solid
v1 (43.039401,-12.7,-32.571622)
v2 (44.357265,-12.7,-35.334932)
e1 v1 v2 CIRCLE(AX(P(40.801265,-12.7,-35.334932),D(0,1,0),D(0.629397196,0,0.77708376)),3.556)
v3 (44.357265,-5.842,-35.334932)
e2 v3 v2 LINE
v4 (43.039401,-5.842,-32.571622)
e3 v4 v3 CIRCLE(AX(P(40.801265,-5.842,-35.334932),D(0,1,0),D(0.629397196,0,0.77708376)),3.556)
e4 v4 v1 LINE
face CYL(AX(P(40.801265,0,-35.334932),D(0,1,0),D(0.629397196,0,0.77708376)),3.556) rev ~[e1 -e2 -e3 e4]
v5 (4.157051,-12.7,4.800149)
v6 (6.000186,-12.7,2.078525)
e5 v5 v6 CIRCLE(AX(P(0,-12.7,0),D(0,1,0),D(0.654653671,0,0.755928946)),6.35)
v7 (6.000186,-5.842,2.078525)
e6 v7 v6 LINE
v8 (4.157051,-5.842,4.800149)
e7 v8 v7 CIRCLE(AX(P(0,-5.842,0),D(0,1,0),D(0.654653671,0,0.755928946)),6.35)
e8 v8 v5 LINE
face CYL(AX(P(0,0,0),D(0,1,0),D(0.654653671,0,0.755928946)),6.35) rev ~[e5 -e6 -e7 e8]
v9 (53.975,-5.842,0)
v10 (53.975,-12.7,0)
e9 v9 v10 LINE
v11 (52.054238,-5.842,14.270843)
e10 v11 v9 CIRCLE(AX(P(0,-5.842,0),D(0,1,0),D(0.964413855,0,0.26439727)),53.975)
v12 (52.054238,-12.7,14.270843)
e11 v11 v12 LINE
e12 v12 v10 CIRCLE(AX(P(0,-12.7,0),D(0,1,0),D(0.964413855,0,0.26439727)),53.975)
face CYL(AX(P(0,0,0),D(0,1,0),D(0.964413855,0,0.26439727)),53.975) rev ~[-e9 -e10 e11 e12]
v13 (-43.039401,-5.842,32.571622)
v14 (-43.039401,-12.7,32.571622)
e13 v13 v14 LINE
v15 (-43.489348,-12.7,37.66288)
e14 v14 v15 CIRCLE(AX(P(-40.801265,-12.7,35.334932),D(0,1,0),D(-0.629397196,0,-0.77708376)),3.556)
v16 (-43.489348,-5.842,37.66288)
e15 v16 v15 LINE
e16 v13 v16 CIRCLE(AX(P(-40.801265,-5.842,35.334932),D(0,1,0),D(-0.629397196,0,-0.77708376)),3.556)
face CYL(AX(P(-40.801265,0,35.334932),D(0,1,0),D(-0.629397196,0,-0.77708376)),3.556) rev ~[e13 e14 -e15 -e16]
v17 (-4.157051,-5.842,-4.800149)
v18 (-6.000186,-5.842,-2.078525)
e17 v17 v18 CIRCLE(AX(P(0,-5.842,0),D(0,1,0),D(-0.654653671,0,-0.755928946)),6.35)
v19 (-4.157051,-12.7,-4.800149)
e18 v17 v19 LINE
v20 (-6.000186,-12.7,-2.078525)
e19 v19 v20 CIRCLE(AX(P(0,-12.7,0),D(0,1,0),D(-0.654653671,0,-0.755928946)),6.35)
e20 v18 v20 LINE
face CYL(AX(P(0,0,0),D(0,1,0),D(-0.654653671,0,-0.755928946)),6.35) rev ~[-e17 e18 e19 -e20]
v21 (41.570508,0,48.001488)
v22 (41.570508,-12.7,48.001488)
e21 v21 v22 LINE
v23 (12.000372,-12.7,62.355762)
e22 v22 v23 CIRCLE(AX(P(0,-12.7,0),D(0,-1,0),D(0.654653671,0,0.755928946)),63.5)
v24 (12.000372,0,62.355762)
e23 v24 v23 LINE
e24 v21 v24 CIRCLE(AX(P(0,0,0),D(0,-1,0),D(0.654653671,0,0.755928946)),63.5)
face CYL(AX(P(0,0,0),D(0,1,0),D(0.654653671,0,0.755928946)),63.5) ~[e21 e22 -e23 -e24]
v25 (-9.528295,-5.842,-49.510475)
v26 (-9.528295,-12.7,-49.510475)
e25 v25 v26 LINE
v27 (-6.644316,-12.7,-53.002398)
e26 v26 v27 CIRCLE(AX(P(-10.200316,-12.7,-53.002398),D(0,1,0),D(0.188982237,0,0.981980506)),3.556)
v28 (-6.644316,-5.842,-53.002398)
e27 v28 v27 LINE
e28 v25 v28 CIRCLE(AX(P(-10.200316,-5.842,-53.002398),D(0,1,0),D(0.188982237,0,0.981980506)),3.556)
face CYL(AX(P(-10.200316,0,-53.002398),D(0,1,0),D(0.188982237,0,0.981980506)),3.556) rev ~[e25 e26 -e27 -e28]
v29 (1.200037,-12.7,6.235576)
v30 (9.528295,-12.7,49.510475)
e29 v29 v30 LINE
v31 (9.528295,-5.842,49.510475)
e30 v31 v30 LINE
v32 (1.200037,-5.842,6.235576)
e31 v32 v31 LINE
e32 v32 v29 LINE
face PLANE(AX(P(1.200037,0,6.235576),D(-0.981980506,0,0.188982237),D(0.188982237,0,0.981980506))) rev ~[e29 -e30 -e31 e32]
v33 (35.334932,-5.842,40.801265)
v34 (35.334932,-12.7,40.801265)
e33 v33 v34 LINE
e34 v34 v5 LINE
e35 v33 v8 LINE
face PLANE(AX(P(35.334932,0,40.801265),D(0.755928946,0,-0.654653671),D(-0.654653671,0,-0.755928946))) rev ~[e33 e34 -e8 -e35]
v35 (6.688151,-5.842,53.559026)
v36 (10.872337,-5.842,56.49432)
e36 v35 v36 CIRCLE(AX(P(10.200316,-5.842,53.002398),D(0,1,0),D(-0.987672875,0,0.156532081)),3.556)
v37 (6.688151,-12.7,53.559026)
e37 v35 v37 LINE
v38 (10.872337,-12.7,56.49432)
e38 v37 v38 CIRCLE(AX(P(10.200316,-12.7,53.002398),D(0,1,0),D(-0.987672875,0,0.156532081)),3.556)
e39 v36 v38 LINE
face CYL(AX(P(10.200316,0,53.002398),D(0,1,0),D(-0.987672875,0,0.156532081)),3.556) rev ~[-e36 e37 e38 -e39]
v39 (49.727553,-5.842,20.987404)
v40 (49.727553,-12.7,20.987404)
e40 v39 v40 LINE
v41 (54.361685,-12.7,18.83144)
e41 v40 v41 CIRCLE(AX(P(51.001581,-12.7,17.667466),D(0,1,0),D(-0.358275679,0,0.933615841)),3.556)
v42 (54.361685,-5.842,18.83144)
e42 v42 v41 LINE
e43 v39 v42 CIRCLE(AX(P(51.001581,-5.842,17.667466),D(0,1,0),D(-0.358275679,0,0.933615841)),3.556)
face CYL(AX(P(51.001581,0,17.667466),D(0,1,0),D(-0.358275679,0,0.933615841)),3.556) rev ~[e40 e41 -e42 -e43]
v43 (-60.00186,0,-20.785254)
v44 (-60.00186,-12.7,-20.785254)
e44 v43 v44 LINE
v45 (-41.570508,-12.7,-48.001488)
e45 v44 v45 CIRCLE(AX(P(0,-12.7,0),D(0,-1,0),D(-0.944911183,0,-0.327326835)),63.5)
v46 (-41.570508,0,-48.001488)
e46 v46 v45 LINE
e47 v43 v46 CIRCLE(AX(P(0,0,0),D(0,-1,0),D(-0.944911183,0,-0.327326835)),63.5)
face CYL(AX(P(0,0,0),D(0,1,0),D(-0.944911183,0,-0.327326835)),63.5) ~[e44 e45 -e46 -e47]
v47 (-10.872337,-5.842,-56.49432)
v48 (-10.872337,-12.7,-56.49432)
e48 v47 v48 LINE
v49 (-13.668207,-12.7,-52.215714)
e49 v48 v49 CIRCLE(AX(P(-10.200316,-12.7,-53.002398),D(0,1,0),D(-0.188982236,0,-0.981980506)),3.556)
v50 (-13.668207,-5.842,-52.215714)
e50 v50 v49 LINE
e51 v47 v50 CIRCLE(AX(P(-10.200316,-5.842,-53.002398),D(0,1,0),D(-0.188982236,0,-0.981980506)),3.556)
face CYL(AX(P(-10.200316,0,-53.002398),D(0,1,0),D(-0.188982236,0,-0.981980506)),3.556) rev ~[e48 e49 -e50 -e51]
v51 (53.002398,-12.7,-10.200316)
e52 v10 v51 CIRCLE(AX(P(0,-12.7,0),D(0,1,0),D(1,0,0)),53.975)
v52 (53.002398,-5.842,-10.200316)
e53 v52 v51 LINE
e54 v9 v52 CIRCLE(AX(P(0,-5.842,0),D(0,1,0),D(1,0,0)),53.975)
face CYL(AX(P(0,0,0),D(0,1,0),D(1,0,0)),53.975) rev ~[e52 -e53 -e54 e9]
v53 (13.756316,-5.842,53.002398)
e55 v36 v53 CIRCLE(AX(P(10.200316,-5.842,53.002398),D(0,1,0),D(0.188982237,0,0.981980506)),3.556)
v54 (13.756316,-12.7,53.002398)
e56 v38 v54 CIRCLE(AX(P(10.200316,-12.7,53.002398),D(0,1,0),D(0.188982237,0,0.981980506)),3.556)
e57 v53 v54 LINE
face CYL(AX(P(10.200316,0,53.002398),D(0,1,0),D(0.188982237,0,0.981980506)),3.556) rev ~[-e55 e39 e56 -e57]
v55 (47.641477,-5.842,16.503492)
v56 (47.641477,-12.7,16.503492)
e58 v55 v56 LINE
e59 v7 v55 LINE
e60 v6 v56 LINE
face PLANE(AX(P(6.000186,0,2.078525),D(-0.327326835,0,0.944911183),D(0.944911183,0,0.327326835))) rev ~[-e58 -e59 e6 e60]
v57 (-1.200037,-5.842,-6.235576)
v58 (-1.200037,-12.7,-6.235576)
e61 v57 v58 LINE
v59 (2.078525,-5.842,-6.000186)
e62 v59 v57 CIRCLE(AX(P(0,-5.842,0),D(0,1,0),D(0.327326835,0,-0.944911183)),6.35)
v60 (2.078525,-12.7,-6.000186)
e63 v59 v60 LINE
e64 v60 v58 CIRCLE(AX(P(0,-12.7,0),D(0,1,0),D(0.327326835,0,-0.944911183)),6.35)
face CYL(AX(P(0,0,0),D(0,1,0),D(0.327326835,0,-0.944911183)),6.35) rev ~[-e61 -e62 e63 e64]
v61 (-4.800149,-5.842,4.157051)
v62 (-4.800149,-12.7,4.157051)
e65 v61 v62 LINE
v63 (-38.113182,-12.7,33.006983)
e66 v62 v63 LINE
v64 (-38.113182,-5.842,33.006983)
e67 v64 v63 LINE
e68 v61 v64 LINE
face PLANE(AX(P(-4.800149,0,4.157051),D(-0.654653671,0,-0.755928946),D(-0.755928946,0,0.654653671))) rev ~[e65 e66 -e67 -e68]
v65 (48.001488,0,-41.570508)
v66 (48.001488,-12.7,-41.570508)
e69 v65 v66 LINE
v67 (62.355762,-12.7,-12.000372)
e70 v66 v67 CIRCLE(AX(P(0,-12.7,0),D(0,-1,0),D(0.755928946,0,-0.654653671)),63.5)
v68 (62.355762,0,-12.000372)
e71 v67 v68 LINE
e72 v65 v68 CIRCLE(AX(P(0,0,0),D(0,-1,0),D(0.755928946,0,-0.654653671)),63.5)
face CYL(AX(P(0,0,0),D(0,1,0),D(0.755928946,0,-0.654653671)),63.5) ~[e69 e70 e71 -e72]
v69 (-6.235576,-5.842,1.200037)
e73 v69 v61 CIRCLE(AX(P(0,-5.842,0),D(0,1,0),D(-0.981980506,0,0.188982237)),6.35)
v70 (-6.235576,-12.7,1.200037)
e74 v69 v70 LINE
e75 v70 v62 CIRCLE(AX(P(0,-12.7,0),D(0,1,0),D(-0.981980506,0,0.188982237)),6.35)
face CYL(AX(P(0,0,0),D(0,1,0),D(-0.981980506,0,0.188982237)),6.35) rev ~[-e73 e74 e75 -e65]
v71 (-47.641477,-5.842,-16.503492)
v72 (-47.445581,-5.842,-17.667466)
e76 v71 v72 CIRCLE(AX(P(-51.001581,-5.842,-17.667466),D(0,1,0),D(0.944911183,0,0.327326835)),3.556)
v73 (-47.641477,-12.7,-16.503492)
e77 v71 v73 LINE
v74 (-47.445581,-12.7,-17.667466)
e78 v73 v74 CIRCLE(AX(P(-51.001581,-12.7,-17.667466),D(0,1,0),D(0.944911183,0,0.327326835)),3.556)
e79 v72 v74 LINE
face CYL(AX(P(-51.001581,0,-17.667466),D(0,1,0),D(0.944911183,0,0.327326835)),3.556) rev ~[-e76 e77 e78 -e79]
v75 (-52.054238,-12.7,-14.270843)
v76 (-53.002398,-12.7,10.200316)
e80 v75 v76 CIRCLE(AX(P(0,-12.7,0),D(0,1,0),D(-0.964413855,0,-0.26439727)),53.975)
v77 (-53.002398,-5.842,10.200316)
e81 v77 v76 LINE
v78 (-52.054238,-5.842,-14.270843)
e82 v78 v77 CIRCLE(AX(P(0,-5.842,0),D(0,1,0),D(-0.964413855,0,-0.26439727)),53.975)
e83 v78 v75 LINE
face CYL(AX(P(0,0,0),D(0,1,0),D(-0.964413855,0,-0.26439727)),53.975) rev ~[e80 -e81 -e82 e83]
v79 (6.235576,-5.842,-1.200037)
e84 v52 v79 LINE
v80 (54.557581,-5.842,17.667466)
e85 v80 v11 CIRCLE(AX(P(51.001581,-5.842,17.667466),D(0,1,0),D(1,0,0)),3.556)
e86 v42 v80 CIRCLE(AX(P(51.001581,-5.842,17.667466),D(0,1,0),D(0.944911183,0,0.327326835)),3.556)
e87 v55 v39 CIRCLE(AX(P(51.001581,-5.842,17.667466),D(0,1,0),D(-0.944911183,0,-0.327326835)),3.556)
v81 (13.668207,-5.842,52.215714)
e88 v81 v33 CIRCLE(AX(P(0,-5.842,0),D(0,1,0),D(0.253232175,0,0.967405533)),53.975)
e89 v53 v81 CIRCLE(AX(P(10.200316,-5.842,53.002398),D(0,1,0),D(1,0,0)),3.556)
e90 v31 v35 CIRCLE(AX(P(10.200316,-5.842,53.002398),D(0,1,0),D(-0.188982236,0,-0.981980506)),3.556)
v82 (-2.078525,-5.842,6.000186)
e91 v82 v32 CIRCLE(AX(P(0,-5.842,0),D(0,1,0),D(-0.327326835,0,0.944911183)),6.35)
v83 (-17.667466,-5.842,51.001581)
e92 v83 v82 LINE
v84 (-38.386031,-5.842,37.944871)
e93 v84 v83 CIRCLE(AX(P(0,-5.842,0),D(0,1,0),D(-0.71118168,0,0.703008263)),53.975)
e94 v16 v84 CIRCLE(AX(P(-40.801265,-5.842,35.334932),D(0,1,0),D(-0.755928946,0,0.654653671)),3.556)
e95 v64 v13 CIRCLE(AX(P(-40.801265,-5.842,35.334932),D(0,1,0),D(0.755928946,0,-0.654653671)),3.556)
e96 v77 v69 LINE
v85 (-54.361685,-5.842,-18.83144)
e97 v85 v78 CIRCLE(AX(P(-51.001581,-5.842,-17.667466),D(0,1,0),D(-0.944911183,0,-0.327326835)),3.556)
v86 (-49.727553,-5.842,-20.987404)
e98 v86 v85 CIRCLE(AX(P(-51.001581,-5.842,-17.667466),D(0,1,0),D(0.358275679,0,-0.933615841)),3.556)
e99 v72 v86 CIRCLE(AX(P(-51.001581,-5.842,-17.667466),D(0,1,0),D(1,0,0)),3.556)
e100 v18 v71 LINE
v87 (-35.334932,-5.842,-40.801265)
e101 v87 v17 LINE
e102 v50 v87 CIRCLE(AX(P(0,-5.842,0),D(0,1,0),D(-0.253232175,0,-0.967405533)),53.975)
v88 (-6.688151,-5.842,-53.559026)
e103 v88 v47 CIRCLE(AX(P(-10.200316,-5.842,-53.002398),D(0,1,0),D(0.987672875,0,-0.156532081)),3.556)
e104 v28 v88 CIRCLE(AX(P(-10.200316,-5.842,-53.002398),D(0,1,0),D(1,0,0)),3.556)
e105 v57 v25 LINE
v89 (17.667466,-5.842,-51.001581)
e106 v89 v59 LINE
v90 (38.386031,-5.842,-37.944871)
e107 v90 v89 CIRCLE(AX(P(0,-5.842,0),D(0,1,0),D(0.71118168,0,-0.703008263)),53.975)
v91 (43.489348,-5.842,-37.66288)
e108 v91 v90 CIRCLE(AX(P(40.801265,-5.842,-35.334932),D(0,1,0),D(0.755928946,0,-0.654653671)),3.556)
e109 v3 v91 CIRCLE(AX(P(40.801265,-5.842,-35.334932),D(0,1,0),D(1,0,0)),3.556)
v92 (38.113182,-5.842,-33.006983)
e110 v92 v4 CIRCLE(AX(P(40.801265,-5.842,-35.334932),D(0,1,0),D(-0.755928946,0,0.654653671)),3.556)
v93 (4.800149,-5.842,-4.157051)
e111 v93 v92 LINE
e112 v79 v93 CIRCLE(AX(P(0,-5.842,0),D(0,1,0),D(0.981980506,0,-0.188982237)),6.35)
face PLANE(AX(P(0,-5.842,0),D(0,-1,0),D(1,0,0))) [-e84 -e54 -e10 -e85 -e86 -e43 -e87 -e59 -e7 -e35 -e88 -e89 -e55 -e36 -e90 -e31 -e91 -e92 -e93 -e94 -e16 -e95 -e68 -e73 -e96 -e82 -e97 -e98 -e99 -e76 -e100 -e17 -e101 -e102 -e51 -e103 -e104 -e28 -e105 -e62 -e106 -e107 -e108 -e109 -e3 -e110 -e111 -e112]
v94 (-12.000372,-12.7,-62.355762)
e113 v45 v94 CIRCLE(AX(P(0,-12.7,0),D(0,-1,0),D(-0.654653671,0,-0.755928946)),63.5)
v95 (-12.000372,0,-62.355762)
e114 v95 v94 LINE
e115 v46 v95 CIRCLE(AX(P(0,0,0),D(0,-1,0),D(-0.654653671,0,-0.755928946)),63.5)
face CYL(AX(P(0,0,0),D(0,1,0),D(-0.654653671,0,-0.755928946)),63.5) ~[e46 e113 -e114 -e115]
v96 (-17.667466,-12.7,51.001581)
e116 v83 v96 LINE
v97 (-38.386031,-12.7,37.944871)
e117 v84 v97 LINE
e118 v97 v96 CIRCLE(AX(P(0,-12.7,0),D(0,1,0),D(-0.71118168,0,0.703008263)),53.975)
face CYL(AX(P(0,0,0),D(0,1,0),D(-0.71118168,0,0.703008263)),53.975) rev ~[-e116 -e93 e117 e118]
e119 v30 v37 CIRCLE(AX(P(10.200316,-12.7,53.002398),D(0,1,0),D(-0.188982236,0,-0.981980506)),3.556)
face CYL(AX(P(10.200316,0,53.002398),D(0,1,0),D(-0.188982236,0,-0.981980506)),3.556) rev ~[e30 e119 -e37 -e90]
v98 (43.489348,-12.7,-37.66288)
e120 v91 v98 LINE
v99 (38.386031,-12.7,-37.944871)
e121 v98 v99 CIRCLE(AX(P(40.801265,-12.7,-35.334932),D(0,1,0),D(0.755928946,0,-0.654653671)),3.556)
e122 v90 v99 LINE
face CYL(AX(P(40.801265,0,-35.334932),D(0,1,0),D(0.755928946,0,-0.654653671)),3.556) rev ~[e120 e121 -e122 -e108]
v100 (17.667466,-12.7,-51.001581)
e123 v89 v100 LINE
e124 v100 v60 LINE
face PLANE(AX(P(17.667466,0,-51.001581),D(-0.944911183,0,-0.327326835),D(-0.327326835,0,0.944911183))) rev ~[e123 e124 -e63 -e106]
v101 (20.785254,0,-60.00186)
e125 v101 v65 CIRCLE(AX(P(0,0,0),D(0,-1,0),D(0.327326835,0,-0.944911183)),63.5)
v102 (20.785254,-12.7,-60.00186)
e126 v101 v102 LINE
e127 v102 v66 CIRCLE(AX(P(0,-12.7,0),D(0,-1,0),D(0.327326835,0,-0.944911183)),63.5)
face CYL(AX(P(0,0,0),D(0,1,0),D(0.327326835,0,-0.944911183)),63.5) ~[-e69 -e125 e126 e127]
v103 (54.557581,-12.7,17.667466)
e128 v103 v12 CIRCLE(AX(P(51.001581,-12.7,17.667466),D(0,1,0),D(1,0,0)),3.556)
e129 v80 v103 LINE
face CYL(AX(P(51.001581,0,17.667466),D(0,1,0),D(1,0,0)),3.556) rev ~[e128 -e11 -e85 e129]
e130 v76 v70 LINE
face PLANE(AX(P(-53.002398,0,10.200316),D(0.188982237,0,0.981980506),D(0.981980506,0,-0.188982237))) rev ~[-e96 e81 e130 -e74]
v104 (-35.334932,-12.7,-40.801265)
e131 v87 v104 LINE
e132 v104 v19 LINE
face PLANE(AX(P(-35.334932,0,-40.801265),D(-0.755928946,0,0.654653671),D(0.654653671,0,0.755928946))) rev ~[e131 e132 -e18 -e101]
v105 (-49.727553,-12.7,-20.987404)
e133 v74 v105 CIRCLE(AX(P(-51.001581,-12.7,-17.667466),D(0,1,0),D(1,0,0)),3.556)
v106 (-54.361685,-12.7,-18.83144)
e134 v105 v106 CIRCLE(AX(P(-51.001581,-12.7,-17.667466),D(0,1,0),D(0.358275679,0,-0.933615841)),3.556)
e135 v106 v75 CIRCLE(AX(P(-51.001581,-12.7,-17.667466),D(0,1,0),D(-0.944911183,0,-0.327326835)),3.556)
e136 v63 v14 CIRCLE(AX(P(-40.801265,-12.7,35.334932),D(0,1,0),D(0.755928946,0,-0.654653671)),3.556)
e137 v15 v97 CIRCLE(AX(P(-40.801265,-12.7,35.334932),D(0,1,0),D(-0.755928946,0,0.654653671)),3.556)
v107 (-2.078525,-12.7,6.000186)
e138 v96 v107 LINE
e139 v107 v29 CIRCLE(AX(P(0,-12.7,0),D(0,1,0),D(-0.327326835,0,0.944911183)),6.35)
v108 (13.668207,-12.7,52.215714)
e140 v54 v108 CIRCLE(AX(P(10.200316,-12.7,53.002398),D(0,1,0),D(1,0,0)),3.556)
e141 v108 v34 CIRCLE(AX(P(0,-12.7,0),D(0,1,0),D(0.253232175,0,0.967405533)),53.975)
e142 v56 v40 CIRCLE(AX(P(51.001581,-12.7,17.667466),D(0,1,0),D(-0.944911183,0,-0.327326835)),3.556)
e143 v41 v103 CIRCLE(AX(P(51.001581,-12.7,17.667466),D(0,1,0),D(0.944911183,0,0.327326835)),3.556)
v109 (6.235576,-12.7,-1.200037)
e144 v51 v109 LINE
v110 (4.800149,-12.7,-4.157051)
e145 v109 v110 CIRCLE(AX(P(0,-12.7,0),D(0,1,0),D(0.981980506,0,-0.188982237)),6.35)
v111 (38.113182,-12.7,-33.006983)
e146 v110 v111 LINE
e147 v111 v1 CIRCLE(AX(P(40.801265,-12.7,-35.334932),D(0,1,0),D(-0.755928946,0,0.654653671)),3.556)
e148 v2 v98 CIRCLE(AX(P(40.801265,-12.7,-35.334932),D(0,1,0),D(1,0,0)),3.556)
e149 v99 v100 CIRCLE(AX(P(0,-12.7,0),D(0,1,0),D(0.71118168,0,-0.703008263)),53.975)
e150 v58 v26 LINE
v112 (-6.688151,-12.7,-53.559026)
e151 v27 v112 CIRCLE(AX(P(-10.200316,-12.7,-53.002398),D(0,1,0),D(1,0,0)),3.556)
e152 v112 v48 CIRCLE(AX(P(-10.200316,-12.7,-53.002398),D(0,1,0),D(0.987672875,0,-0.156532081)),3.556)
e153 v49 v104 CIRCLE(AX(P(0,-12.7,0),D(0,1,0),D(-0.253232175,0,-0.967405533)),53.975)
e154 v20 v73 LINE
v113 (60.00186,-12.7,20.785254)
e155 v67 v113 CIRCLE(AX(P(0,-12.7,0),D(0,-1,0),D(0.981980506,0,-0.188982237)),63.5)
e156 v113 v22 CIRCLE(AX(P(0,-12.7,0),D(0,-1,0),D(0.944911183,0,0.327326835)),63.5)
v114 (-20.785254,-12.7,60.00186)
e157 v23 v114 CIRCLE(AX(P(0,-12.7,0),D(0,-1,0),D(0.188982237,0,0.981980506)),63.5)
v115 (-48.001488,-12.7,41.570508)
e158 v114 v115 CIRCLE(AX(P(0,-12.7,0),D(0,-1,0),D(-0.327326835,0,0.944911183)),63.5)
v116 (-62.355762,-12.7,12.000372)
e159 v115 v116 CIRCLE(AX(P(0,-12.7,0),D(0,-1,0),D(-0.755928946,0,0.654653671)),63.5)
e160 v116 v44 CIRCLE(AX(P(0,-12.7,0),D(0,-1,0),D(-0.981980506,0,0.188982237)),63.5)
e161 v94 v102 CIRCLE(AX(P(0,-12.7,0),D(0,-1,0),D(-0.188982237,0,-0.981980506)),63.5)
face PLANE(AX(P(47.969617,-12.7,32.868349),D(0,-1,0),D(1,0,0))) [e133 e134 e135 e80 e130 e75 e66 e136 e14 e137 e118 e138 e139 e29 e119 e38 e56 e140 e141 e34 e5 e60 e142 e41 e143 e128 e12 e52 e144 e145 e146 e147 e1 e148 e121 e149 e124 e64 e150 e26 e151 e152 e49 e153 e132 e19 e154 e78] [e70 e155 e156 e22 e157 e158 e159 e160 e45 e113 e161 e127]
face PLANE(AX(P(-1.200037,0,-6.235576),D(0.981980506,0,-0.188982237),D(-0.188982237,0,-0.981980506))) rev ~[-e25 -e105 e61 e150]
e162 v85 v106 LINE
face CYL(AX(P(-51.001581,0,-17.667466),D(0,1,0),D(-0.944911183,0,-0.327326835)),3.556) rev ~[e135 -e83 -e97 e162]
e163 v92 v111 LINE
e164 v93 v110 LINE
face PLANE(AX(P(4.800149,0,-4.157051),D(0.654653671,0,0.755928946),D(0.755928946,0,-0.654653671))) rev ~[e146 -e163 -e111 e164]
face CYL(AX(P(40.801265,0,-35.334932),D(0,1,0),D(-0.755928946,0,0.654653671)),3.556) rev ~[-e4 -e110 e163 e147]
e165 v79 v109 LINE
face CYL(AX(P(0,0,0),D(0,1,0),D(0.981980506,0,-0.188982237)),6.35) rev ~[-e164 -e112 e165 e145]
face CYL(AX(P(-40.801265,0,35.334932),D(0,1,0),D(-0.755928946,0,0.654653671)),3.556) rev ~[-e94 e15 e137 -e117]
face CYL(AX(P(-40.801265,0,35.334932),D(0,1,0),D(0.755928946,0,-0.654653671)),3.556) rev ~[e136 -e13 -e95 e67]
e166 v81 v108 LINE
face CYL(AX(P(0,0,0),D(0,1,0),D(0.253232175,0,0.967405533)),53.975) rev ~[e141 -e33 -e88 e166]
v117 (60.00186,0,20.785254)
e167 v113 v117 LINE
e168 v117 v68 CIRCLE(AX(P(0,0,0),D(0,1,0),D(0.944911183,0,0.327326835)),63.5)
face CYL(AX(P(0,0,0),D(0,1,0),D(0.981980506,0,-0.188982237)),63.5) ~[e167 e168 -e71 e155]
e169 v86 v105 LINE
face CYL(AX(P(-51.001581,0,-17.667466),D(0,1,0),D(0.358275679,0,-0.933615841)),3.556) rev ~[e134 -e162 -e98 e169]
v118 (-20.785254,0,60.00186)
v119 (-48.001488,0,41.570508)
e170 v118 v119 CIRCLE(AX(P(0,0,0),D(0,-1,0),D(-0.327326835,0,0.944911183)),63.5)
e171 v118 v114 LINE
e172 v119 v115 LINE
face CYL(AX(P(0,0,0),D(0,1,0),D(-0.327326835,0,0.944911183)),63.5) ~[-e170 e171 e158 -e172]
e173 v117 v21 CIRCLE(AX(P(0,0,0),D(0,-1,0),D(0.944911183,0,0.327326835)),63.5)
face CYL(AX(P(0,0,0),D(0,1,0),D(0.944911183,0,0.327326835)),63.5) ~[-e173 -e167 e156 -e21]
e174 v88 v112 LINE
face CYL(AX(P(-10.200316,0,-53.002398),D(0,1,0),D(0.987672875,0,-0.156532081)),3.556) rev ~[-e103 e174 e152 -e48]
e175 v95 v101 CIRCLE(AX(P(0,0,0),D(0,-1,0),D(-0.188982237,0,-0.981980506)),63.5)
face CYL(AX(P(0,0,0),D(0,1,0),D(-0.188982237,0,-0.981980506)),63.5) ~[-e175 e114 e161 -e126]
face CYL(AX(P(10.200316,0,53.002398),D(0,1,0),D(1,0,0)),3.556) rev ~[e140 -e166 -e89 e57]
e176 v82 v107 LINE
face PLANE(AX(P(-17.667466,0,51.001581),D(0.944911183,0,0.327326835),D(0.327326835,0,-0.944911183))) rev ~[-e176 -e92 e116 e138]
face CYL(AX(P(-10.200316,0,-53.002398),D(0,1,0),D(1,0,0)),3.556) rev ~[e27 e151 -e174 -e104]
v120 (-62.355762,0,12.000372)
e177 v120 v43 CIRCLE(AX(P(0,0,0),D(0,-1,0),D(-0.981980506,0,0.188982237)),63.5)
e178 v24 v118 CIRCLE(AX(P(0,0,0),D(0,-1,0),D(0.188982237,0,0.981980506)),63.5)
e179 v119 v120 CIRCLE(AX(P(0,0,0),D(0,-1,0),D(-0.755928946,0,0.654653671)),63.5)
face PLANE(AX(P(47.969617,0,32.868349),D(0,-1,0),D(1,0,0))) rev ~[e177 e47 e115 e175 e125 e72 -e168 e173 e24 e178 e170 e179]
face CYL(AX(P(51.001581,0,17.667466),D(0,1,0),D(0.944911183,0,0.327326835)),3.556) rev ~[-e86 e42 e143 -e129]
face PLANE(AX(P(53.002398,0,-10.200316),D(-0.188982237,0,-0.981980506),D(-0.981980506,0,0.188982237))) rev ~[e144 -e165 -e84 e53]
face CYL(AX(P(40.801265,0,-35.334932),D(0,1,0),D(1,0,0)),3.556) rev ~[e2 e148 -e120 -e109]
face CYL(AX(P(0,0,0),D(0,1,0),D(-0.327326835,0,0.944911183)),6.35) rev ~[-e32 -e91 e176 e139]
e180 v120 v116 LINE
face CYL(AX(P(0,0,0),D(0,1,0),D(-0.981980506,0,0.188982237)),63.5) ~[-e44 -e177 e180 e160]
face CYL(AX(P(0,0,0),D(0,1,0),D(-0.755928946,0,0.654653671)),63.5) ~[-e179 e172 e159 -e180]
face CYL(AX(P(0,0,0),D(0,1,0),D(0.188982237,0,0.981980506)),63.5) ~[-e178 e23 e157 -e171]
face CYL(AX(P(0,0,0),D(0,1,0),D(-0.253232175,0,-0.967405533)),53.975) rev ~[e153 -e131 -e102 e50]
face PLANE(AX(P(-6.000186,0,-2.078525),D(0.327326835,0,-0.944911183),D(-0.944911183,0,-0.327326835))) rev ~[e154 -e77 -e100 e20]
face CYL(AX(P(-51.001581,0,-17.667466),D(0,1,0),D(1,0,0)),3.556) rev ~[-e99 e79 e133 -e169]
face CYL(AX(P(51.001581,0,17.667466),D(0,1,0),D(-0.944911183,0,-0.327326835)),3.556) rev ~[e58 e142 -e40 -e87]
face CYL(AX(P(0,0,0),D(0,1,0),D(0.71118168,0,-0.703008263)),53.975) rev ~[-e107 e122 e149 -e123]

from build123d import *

# Parameters (mm, degrees)
F1_DEPTH = 12.7
F2_R     = 63.5
F3_DEPTH = 5.842


# Not quite as in the source:
# - a feature names something its author has since deleted; it is built from what else it names


with BuildPart() as f1:
    # F0 (on Front) → F1 (new body)
    with BuildSketch(Plane.XZ):
        with BuildLine():
            Line((54.3616852417, 18.8314401648), (60.0018600902, 20.785254045))
            ThreePointArc((60.0018600902, 20.785254045), (52.5777266824, 35.6066378209), (41.57050809, 48.0014880722))
            Line((41.57050809, 48.0014880722), (35.3349318765, 40.8012648613))
            ThreePointArc((35.3349318765, 40.8012648613), (43.6698276291, 31.7213930943), (49.7275527638, 20.9874038681))
            ThreePointArc((49.7275527638, 20.9874038681), (52.5015720726, 20.8916190072), (54.3616852417, 18.8314401648))
        make_face()
        with BuildLine():
            Line((35.3349318765, 40.8012648613), (41.57050809, 48.0014880722))
            ThreePointArc((41.57050809, 48.0014880722), (27.7303280697, 57.1251162375), (12.000372018, 62.3557621349))
            Line((12.000372018, 62.3557621349), (10.8723370483, 56.4943204943))
            ThreePointArc((10.8723370483, 56.4943204943), (12.9421077904, 55.2668436539), (13.7563162153, 53.0023978147))
            ThreePointArc((13.7563162153, 53.0023978147), (13.7342201731, 52.6065963274), (13.6682066443, 52.2157136514))
            ThreePointArc((13.6682066443, 52.2157136514), (25.1574900679, 47.7535477057), (35.3349318765, 40.8012648613))
        make_face()
        with BuildLine():
            Line((10.8723370483, 56.4943204943), (12.000372018, 62.3557621349))
            ThreePointArc((12.000372018, 62.3557621349), (-4.5473895551, 63.3369658907), (-20.785254045, 60.0018600902))
            Line((-20.785254045, 60.0018600902), (-17.6674659382, 51.0015810767))
            ThreePointArc((-17.6674659382, 51.0015810767), (-5.6366184485, 53.6798766529), (6.6881514727, 53.5590258955))
            ThreePointArc((6.6881514727, 53.5590258955), (8.1581132499, 55.9135046571), (10.8723370483, 56.4943204943))
        make_face()
        with BuildLine():
            Line((-17.6674659382, 51.0015810767), (-20.785254045, 60.0018600902))
            ThreePointArc((-20.785254045, 60.0018600902), (-35.6066378209, 52.5777266824), (-48.0014880722, 41.57050809))
            Line((-48.0014880722, 41.57050809), (-43.4893481934, 37.6628803295))
            ThreePointArc((-43.4893481934, 37.6628803295), (-40.9974571589, 38.8855155725), (-38.3860311767, 37.9448710039))
            ThreePointArc((-38.3860311767, 37.9448710039), (-28.7770404, 45.6637993471), (-17.6674659382, 51.0015810767))
        make_face()
        with BuildLine():
            Line((-43.4893481934, 37.6628803295), (-48.0014880722, 41.57050809))
            ThreePointArc((-48.0014880722, 41.57050809), (-57.1251162375, 27.7303280697), (-62.3557621349, 12.000372018))
            Line((-62.3557621349, 12.000372018), (-53.0023978147, 10.2003162153))
            ThreePointArc((-53.0023978147, 10.2003162153), (-49.3064460776, 21.9584835586), (-43.0394012911, 32.5716220275))
            ThreePointArc((-43.0394012911, 32.5716220275), (-44.3434588227, 35.0218856499), (-43.4893481934, 37.6628803295))
        make_face()
        with BuildLine():
            Line((-53.0023978147, 10.2003162153), (-62.3557621349, 12.000372018))
            ThreePointArc((-62.3557621349, 12.000372018), (-63.3369658907, -4.5473895551), (-60.0018600902, -20.785254045))
            Line((-60.0018600902, -20.785254045), (-54.3616852417, -18.8314401648))
            ThreePointArc((-54.3616852417, -18.8314401648), (-54.1745729045, -16.062081604), (-52.054237821, -14.2708426476))
            ThreePointArc((-52.054237821, -14.2708426476), (-53.9345304679, -2.0897483586), (-53.0023978147, 10.2003162153))
        make_face()
        with BuildLine():
            ThreePointArc((-60.0018600902, -20.785254045), (-52.5777266824, -35.6066378209), (-41.57050809, -48.0014880722))
            Line((-41.57050809, -48.0014880722), (-35.3349318765, -40.8012648613))
            ThreePointArc((-35.3349318765, -40.8012648613), (-43.6698276292, -31.7213930943), (-49.7275527638, -20.9874038681))
            ThreePointArc((-49.7275527638, -20.9874038681), (-52.5015720726, -20.8916190072), (-54.3616852417, -18.8314401648))
            Line((-54.3616852417, -18.8314401648), (-60.0018600902, -20.785254045))
        make_face()
        with BuildLine():
            ThreePointArc((-41.57050809, -48.0014880722), (-27.7303280697, -57.1251162375), (-12.000372018, -62.3557621349))
            Line((-12.000372018, -62.3557621349), (-10.8723370483, -56.4943204943))
            ThreePointArc((-10.8723370483, -56.4943204943), (-13.1771157456, -54.9475971764), (-13.6682066443, -52.2157136514))
            ThreePointArc((-13.6682066443, -52.2157136514), (-25.1574900679, -47.7535477057), (-35.3349318765, -40.8012648613))
            Line((-35.3349318765, -40.8012648613), (-41.57050809, -48.0014880722))
        make_face()
        with BuildLine():
            ThreePointArc((-12.000372018, -62.3557621349), (4.5473895551, -63.3369658907), (20.785254045, -60.0018600902))
            Line((20.785254045, -60.0018600902), (17.6674659382, -51.0015810767))
            ThreePointArc((17.6674659382, -51.0015810767), (5.6366184485, -53.6798766529), (-6.6881514727, -53.5590258955))
            ThreePointArc((-6.6881514727, -53.5590258955), (-8.1581132499, -55.9135046571), (-10.8723370483, -56.4943204943))
            Line((-10.8723370483, -56.4943204943), (-12.000372018, -62.3557621349))
        make_face()
        with BuildLine():
            ThreePointArc((20.785254045, -60.0018600902), (35.6066378209, -52.5777266824), (48.0014880722, -41.57050809))
            Line((48.0014880722, -41.57050809), (43.4893481934, -37.6628803295))
            ThreePointArc((43.4893481934, -37.6628803295), (40.9974571589, -38.8855155725), (38.3860311767, -37.9448710039))
            ThreePointArc((38.3860311767, -37.9448710039), (28.7770404, -45.6637993471), (17.6674659382, -51.0015810767))
            Line((17.6674659382, -51.0015810767), (20.785254045, -60.0018600902))
        make_face()
        with BuildLine():
            ThreePointArc((48.0014880722, -41.57050809), (57.1251162375, -27.7303280697), (62.3557621349, -12.000372018))
            Line((62.3557621349, -12.000372018), (53.0023978147, -10.2003162153))
            ThreePointArc((53.0023978147, -10.2003162153), (49.3064460776, -21.9584835586), (43.0394012911, -32.5716220275))
            ThreePointArc((43.0394012911, -32.5716220275), (44.0109337807, -33.8041930262), (44.3572648613, -35.3349318765))
            ThreePointArc((44.3572648613, -35.3349318765), (44.1332282712, -36.5771701127), (43.4893481934, -37.6628803295))
            Line((43.4893481934, -37.6628803295), (48.0014880722, -41.57050809))
        make_face()
        with BuildLine():
            ThreePointArc((62.3557621349, -12.000372018), (63.2132932838, -6.0274001208), (63.5, 0))
            ThreePointArc((63.5, 0), (62.6193584913, 10.5387827635), (60.0018600902, 20.785254045))
            Line((60.0018600902, 20.785254045), (54.3616852417, 18.8314401648))
            ThreePointArc((54.3616852417, 18.8314401648), (54.5082651522, 18.257637773), (54.5575810767, 17.6674659382))
            ThreePointArc((54.5575810767, 17.6674659382), (53.864130935, 15.5577398165), (52.054237821, 14.2708426476))
            ThreePointArc((52.054237821, 14.2708426476), (53.4926542218, 7.1997617534), (53.975, 0))
            ThreePointArc((53.975, 0), (53.7312992912, -5.1232901027), (53.0023978147, -10.2003162153))
            Line((53.0023978147, -10.2003162153), (62.3557621349, -12.000372018))
        make_face()
        with BuildLine():
            ThreePointArc((-6.2355762135, 1.2000372018), (-5.7125116237, 2.773032807), (-4.8001488072, 4.157050809))
            Line((-4.8001488072, 4.157050809), (-38.1131815293, 33.0069834234))
            ThreePointArc((-38.1131815293, 33.0069834234), (-40.4882186348, 31.7927379151), (-43.0394012911, 32.5716220275))
            ThreePointArc((-43.0394012911, 32.5716220275), (-49.3064460776, 21.9584835586), (-53.0023978147, 10.2003162153))
            Line((-53.0023978147, 10.2003162153), (-6.2355762135, 1.2000372018))
        make_face()
        with BuildLine():
            ThreePointArc((-6.6881514727, -53.5590258955), (5.6366184485, -53.6798766529), (17.6674659382, -51.0015810767))
            Line((17.6674659382, -51.0015810767), (2.0785254045, -6.000186009))
            ThreePointArc((2.0785254045, -6.000186009), (0.4547389555, -6.3336965891), (-1.2000372018, -6.2355762135))
            Line((-1.2000372018, -6.2355762135), (-9.5282953823, -49.5104751351))
            ThreePointArc((-9.5282953823, -49.5104751351), (-7.4585246403, -50.7379519754), (-6.6443162153, -53.0023978147))
            ThreePointArc((-6.6443162153, -53.0023978147), (-6.6552919682, -53.2815735435), (-6.6881514727, -53.5590258955))
        make_face()
        with BuildLine():
            Line((-35.3349318765, -40.8012648613), (-4.157050809, -4.8001488072))
            ThreePointArc((-4.157050809, -4.8001488072), (-5.2577726682, -3.5606637821), (-6.000186009, -2.0785254045))
            Line((-6.000186009, -2.0785254045), (-47.6414769116, -16.5034917117))
            ThreePointArc((-47.6414769116, -16.5034917117), (-47.4948970012, -17.0772941035), (-47.4455810767, -17.6674659382))
            ThreePointArc((-47.4455810767, -17.6674659382), (-48.0710878861, -19.681751335), (-49.7275527638, -20.9874038681))
            ThreePointArc((-49.7275527638, -20.9874038681), (-43.6698276292, -31.7213930943), (-35.3349318765, -40.8012648613))
        make_face()
        with BuildLine():
            ThreePointArc((6.6881514727, 53.5590258955), (-5.6366184485, 53.6798766529), (-17.6674659382, 51.0015810767))
            Line((-17.6674659382, 51.0015810767), (-2.0785254045, 6.000186009))
            ThreePointArc((-2.0785254045, 6.000186009), (-0.4547389555, 6.3336965891), (1.2000372018, 6.2355762135))
            Line((1.2000372018, 6.2355762135), (9.5282953823, 49.5104751351))
            ThreePointArc((9.5282953823, 49.5104751351), (7.2892093729, 50.9601948492), (6.6881514727, 53.5590258955))
        make_face()
        with BuildLine():
            ThreePointArc((43.0394012911, -32.5716220275), (49.3064460776, -21.9584835586), (53.0023978147, -10.2003162153))
            Line((53.0023978147, -10.2003162153), (6.2355762135, -1.2000372018))
            ThreePointArc((6.2355762135, -1.2000372018), (5.7125116237, -2.773032807), (4.8001488072, -4.157050809))
            Line((4.8001488072, -4.157050809), (38.1131815293, -33.0069834234))
            ThreePointArc((38.1131815293, -33.0069834234), (40.4882186348, -31.7927379151), (43.0394012911, -32.5716220275))
        make_face()
        with BuildLine():
            ThreePointArc((49.7275527638, 20.9874038681), (43.6698276291, 31.7213930943), (35.3349318765, 40.8012648613))
            Line((35.3349318765, 40.8012648613), (4.157050809, 4.8001488072))
            ThreePointArc((4.157050809, 4.8001488072), (5.2577726682, 3.5606637821), (6.000186009, 2.0785254045))
            Line((6.000186009, 2.0785254045), (47.6414769116, 16.5034917117))
            ThreePointArc((47.6414769116, 16.5034917117), (47.7774280077, 19.1674569341), (49.7275527638, 20.9874038681))
        make_face()
    extrude(amount=F1_DEPTH)

    # F2 (on Front) → F3 (join)
    with BuildSketch(Plane.XZ):
        Circle(F2_R)
    extrude(amount=F3_DEPTH)


solid = f1.part
